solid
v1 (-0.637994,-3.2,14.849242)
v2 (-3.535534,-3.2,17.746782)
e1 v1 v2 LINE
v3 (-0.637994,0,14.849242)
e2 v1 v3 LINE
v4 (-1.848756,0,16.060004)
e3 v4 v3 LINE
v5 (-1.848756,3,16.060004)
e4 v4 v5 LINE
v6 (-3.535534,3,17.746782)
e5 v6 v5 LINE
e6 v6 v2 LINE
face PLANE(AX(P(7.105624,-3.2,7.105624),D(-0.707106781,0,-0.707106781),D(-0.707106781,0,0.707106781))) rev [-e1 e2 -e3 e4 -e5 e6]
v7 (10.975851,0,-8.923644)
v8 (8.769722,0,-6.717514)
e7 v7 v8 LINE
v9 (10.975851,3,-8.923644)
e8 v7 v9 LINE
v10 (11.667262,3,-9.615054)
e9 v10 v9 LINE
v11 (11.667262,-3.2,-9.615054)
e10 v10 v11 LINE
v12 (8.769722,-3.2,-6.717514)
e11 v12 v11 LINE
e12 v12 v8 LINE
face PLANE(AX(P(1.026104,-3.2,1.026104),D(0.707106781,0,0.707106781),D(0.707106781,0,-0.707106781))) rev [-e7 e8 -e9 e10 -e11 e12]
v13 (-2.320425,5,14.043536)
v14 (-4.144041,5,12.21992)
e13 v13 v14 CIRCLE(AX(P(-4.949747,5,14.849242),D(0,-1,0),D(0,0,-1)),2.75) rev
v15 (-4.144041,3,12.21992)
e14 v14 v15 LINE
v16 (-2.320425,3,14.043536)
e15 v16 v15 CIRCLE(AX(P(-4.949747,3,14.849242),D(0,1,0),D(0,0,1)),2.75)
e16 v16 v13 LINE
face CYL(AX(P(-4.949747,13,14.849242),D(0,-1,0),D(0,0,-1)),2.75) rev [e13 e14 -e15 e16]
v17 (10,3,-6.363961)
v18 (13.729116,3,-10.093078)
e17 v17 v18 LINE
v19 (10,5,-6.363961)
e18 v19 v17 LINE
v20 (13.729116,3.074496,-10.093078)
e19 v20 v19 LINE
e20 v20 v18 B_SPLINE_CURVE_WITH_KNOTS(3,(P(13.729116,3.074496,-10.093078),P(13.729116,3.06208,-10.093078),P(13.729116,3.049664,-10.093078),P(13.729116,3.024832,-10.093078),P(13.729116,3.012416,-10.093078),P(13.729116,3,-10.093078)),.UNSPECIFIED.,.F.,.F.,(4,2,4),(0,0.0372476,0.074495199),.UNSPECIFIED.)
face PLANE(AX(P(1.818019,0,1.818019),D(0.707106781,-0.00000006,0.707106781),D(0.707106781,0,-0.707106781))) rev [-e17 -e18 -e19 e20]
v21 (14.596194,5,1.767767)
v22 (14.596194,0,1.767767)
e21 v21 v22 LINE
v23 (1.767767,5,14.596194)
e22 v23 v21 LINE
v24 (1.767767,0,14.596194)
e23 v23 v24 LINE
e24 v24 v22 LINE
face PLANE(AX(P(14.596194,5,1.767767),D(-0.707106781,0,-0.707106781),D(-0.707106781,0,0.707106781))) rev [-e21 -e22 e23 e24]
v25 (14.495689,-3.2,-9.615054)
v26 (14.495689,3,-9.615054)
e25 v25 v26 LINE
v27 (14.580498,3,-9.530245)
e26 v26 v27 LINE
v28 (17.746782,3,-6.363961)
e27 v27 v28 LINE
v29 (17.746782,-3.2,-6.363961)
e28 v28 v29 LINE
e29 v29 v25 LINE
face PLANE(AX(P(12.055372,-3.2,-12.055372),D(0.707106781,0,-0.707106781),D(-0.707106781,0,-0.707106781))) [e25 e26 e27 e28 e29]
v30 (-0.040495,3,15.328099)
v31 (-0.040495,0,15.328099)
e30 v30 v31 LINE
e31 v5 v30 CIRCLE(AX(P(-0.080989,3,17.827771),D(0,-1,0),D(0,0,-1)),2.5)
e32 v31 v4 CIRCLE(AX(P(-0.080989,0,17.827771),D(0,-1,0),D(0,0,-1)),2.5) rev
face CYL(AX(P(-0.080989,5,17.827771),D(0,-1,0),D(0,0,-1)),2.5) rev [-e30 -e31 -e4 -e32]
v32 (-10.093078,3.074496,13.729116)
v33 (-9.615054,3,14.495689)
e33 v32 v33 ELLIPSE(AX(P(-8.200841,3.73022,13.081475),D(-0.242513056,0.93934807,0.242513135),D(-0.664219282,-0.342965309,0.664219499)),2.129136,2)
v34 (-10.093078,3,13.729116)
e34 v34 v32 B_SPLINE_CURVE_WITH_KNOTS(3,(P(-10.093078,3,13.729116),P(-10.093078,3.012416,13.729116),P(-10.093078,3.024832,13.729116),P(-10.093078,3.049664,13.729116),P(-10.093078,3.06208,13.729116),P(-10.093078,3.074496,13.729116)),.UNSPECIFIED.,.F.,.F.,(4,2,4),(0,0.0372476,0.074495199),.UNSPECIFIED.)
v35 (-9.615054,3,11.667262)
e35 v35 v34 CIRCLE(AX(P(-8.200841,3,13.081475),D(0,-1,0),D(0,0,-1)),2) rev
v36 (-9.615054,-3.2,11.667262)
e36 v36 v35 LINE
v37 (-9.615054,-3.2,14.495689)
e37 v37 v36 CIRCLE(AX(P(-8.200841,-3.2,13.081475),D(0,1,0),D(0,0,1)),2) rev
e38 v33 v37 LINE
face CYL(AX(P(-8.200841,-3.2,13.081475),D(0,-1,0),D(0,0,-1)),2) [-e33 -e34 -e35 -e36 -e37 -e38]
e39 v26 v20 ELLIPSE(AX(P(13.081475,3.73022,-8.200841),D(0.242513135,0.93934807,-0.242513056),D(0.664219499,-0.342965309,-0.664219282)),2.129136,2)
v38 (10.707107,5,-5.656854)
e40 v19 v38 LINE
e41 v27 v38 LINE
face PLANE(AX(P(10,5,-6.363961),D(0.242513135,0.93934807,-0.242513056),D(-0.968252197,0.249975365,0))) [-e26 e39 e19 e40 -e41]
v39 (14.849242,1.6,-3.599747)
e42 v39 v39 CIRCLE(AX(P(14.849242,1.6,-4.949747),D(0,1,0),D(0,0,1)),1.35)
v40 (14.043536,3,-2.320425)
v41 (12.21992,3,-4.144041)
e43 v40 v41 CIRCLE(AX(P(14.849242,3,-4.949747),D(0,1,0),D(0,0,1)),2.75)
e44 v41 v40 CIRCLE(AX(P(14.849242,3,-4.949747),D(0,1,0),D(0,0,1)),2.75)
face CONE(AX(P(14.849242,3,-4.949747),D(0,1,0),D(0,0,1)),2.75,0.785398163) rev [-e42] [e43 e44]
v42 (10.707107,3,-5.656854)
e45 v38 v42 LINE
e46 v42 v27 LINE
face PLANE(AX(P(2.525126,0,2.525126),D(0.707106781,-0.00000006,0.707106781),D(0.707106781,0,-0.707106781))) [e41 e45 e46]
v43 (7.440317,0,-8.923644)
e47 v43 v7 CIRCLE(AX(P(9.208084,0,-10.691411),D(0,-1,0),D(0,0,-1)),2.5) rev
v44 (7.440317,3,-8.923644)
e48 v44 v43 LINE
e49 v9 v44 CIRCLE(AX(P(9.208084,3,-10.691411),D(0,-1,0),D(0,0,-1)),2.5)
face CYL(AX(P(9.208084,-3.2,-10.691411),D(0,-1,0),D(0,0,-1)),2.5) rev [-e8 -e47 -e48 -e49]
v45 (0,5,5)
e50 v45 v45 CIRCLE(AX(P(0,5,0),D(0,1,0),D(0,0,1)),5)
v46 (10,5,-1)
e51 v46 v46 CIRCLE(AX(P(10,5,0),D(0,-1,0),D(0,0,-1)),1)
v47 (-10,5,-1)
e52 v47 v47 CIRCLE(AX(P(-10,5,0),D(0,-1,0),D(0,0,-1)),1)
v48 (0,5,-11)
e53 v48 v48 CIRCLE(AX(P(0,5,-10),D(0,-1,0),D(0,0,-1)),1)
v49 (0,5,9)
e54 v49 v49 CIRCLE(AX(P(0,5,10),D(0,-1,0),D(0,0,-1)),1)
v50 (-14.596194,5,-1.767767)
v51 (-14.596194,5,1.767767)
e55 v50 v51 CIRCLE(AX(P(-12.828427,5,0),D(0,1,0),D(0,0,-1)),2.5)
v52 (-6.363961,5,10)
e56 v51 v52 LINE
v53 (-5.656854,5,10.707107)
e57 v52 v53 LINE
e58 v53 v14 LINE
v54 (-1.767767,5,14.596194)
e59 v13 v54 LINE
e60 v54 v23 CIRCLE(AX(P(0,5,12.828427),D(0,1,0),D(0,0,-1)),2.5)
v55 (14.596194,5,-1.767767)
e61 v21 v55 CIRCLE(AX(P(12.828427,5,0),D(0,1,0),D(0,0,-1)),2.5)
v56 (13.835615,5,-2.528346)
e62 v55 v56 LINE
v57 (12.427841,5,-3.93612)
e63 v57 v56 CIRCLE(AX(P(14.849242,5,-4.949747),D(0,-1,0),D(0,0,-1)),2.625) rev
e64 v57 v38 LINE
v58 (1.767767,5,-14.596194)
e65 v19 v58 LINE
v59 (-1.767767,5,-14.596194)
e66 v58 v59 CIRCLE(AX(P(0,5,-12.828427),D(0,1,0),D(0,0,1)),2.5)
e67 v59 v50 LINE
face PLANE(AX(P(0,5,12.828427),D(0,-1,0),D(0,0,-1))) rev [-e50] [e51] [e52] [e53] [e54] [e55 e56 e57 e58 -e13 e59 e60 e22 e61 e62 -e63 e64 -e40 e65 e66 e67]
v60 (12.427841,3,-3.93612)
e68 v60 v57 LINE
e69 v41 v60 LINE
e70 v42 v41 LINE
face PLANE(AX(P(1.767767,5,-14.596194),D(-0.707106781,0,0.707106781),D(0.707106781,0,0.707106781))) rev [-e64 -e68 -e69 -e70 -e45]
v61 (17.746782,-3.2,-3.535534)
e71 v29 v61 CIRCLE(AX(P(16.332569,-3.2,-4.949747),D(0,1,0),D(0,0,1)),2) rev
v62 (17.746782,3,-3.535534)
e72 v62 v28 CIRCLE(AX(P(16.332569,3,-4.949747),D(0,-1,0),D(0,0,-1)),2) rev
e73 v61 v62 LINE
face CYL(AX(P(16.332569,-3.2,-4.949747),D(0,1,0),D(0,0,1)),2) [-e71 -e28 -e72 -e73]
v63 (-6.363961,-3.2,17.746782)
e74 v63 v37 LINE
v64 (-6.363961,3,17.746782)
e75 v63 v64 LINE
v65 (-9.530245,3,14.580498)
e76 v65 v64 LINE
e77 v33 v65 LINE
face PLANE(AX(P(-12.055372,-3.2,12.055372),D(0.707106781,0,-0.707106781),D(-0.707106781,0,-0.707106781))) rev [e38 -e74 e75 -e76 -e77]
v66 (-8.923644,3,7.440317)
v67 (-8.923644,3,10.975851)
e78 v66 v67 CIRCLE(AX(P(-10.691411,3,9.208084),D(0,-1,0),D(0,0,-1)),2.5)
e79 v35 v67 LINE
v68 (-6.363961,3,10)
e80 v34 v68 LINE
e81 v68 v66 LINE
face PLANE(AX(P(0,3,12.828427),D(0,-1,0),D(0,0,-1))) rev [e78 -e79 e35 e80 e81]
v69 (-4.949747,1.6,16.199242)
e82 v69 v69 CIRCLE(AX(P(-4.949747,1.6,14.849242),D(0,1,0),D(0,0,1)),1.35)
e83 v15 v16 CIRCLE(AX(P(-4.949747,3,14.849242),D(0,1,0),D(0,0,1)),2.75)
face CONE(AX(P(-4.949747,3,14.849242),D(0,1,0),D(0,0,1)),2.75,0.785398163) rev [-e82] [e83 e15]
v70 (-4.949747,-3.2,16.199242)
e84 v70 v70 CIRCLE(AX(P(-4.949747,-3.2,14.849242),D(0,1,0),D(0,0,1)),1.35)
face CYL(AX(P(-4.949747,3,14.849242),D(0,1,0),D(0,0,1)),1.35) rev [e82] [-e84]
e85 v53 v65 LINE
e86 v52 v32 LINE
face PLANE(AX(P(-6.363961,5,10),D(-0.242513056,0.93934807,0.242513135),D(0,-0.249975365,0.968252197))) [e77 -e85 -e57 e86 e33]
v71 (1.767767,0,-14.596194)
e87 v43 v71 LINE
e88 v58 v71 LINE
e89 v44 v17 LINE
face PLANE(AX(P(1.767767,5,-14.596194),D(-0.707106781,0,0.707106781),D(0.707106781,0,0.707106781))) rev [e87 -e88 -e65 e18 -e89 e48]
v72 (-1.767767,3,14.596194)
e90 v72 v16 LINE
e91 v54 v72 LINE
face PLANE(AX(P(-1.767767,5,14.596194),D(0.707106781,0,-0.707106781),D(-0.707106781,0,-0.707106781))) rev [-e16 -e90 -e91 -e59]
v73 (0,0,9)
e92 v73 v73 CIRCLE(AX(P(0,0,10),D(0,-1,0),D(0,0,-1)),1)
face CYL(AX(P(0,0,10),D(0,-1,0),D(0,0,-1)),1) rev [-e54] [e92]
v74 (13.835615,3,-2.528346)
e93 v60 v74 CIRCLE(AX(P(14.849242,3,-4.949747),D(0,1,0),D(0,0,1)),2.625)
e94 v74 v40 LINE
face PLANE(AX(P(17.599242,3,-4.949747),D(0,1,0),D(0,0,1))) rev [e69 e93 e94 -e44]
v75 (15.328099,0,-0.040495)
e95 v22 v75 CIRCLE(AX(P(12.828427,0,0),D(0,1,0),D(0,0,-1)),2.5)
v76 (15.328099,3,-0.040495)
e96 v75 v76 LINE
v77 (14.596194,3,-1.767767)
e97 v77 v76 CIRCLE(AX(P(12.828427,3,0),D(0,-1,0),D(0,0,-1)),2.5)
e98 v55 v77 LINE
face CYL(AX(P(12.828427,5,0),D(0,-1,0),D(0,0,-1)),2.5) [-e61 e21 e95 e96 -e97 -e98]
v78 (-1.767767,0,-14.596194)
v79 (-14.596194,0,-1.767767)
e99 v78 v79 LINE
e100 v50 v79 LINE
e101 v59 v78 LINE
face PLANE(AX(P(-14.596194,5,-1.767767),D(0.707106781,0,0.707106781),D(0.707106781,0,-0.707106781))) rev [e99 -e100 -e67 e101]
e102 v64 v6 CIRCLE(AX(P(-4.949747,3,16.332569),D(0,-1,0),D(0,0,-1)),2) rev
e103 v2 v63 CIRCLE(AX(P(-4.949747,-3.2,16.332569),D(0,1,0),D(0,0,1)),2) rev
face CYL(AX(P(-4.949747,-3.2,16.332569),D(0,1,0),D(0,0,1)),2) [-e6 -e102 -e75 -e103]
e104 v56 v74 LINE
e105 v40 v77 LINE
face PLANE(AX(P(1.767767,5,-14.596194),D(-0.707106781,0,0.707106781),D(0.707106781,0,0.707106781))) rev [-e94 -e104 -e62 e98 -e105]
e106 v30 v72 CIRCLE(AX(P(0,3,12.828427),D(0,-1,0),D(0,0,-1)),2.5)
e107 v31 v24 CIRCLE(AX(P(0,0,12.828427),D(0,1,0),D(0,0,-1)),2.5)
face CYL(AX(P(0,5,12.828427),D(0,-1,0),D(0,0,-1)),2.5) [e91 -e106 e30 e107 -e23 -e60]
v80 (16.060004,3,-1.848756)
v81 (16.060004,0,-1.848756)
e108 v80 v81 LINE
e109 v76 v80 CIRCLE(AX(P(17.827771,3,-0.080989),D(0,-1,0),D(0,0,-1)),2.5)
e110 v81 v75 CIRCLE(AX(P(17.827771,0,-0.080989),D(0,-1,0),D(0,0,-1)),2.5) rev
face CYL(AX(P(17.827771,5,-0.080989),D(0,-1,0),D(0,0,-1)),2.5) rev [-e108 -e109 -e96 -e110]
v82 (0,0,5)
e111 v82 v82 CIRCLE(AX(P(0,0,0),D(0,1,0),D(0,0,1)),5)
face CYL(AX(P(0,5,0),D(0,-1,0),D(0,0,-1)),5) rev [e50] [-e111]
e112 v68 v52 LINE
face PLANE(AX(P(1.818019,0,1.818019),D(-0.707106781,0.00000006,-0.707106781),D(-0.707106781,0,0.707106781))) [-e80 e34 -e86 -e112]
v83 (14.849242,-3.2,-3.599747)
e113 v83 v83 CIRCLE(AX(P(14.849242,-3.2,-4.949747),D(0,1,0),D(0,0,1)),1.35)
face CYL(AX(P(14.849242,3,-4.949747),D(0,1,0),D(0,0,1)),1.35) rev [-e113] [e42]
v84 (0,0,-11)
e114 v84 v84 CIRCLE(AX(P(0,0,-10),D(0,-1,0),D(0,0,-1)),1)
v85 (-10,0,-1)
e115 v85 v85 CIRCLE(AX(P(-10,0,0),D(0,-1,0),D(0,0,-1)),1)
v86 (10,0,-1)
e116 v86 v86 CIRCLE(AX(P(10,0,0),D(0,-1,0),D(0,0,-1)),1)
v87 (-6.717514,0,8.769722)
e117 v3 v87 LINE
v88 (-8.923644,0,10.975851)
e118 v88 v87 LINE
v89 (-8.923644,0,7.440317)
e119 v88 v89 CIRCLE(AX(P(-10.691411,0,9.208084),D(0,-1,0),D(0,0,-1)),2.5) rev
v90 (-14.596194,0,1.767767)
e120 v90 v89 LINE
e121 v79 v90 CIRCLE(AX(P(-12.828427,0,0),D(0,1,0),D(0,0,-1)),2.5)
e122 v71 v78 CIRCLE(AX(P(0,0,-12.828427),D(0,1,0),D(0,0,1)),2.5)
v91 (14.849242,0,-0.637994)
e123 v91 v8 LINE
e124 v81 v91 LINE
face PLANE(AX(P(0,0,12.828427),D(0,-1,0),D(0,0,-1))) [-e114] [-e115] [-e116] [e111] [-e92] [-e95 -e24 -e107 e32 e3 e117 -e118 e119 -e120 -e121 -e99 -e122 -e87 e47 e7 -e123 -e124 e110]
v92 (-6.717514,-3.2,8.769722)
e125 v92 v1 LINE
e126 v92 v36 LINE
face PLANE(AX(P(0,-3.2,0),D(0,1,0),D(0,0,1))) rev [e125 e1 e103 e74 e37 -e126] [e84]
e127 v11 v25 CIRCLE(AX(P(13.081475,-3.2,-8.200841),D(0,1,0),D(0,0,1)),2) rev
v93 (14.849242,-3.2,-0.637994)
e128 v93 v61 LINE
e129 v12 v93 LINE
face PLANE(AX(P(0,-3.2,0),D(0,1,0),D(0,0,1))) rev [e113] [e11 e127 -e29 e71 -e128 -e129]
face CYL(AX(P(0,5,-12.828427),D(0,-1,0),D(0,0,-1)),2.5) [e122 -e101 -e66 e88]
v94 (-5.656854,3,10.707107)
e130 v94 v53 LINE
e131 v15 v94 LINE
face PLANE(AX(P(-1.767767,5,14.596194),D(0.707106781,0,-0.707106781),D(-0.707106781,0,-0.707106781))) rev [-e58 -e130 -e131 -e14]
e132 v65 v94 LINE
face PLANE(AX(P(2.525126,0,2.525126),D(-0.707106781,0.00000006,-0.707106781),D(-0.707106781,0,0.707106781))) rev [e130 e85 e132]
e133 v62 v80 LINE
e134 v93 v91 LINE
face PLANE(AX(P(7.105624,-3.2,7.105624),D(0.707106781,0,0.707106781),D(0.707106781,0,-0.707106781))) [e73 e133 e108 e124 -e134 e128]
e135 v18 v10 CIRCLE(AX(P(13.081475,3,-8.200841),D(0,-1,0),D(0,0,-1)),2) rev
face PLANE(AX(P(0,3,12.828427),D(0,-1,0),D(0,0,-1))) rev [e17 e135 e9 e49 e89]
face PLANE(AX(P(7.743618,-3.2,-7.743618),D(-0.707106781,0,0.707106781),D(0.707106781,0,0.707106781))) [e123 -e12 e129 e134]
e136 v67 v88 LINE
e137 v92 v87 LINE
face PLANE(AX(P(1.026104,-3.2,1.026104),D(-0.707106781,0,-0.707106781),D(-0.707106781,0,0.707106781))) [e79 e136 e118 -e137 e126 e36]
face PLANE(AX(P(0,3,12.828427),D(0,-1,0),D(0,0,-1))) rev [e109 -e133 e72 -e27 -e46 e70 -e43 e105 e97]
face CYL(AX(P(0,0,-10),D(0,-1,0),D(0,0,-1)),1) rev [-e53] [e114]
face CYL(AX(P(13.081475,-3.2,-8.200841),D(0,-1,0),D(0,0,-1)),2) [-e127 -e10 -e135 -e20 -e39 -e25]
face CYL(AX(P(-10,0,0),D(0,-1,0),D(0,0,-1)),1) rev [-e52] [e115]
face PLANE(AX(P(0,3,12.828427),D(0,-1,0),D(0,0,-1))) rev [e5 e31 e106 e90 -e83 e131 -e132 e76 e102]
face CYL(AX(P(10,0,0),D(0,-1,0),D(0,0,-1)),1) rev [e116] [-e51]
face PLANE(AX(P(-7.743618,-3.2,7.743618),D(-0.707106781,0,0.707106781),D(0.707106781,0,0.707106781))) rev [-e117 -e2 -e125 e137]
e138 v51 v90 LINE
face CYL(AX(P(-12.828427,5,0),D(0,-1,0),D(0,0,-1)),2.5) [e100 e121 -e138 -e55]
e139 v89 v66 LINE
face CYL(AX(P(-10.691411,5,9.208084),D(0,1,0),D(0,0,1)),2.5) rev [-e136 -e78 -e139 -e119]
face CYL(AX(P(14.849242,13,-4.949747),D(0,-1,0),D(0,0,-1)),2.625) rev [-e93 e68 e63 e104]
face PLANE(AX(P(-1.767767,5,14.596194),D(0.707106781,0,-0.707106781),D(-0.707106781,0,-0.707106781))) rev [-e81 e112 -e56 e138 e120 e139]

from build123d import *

# Parameters (mm, degrees)
SKETCH1_R                                      = 0.5
SKETCH1_R_2                                    = 5
BOSS_EXTRUDE1_DEPTH                            = 5
BOSS_EXTRUDE4_DEPTH                            = 5.7
BOSS_EXTRUDE4_DEPTH_BACK                       = 0.5
SKETCH3_R                                      = 1.3
BOSS_EXTRUDE6_DEPTH                            = 1
FILLET1_R                                      = 2.5
FILLET2_R                                      = 2
F_2_0MM_DOWEL_HOLE1_D                          = 2
F_2_0MM_DOWEL_HOLE1_DEPTH                      = 42.93
F_2_0MM_DOWEL_HOLE1_TIP                        = 0.600860619
SKETCH12_R                                     = 2.75
SKETCH12_R_2                                   = 2.625
CUT_EXTRUDE1_DEPTH                             = 10
CSK_FOR_M2_5_FLAT_HEAD_MACHINE_SCREW1_AT_COUNT = 2
CSK_FOR_M2_5_FLAT_HEAD_MACHINE_SCREW1_AT_PITCH = 28


with BuildPart() as part:
    # Sketch1 → Boss-Extrude1 (new body)
    with BuildSketch(Plane(origin=(0, 0, 0), x_dir=(1, 0, 0), z_dir=(0, 1, 0))):
        with BuildLine():
            Line((1.767766953, 14.596194078), (14.596194078, 1.767766953))
            ThreePointArc((14.596194078, 1.767766953), (15.328427125, 0), (14.596194078, -1.767766953))
            Line((14.596194078, -1.767766953), (1.767766953, -14.596194078))
            ThreePointArc((1.767766953, -14.596194078), (0, -15.328427125), (-1.767766953, -14.596194078))
            Line((-1.767766953, -14.596194078), (-14.596194078, -1.767766953))
            ThreePointArc((-14.596194078, -1.767766953), (-15.328427125, 0), (-14.596194078, 1.767766953))
            Line((-14.596194078, 1.767766953), (-1.767766953, 14.596194078))
            ThreePointArc((-1.767766953, 14.596194078), (0, 15.328427125), (1.767766953, 14.596194078))
        make_face()
        with Locations(Location((0, 10, 0), (0, 0, 270))):
            Circle(SKETCH1_R, mode=Mode.SUBTRACT)
        with Locations(Location((0, -10, 0), (0, 0, 270))):
            Circle(SKETCH1_R, mode=Mode.SUBTRACT)
        with Locations(Location((10, 0, 0), (0, 0, 270))):
            Circle(SKETCH1_R, mode=Mode.SUBTRACT)
        with Locations(Location((-10, 0, 0), (0, 0, 270))):
            Circle(SKETCH1_R, mode=Mode.SUBTRACT)
        with Locations(Location((0, 0, 0), (0, 0, 270))):
            Circle(SKETCH1_R_2, mode=Mode.SUBTRACT)
    extrude(amount=BOSS_EXTRUDE1_DEPTH)

    # Sketch3 → Boss-Extrude4 (add, two sides: drawn at the far end of the back side and taken through both)
    # profile 1 of 4: a face of its own
    with BuildSketch(Plane(origin=(0, -2.7, 0), x_dir=(1, 0, 0), z_dir=(0, 1, 0)).offset(-BOSS_EXTRUDE4_DEPTH_BACK)):
        Polygon((-4.949747468, -10.537489101), (-0.637994164, -14.849242405), (-4.949747468, -19.160995709), (-9.261500772, -14.849242405), align=None)
        with Locations(Location((-4.949747468, -14.849242405, 0), (0, 0, 270))):
            Circle(SKETCH3_R, mode=Mode.SUBTRACT)
    # profile 2 of 4: a face of its own
    with BuildSketch(Plane(origin=(0, -2.7, 0), x_dir=(1, 0, 0), z_dir=(0, 1, 0)).offset(-BOSS_EXTRUDE4_DEPTH_BACK)):
        Polygon((-6.717514421, -8.769722148), (-11.029267725, -13.081475452), (-9.261500772, -14.849242405), (-4.949747468, -10.537489101), align=None)
    # profile 3 of 4: a face of its own
    with BuildSketch(Plane(origin=(0, -2.7, 0), x_dir=(1, 0, 0), z_dir=(0, 1, 0)).offset(-BOSS_EXTRUDE4_DEPTH_BACK)):
        Polygon((19.160995709, 4.949747468), (14.849242405, 9.261500772), (10.537489101, 4.949747468), (14.849242405, 0.637994164), align=None)
        with Locations(Location((14.849242405, 4.949747468, 0), (0, 0, 270))):
            Circle(SKETCH3_R, mode=Mode.SUBTRACT)
    # profile 4 of 4: a face of its own
    with BuildSketch(Plane(origin=(0, -2.7, 0), x_dir=(1, 0, 0), z_dir=(0, 1, 0)).offset(-BOSS_EXTRUDE4_DEPTH_BACK)):
        Polygon((13.081475452, 11.029267725), (14.849242405, 9.261500772), (10.537489101, 4.949747468), (8.769722148, 6.717514421), align=None)
    extrude(amount=BOSS_EXTRUDE4_DEPTH + BOSS_EXTRUDE4_DEPTH_BACK)


with BuildPart() as boss_extrude6_tool:
    # Sketch7 → Boss-Extrude6 (new body)
    with BuildSketch(Plane(origin=(2.525126055, -2.13e-07, 2.525126055), x_dir=(0.7071067811865474, 0, -0.7071067811865477), z_dir=(0.7071067811865465, -5.960464483662305e-08, 0.7071067811865461))):
        Polygon((11.571067812, 5.000000541), (17.04887, 3.00000056), (11.571067812, 3.000000541), align=None)
        Polygon((-11.571067812, 5.000000541), (-17.04887, 3.00000056), (-11.571067812, 3.000000541), align=None)
    extrude(amount=-BOSS_EXTRUDE6_DEPTH)


with BuildPart() as part_1:
    add(part.part)


with BuildPart() as part_2:
    # Boss-Extrude6: joined with boss_extrude6_tool
    add(part_1.part.fuse(boss_extrude6_tool.part, tol=0.00001))

    # Fillet1
    fillet1_edges = [part_2.edges().sort_by_distance(p)[0] for p in [
        (-7.155876652, 1.5, 9.208084379),
        (-0.935534875, 1.5, 15.146783115),
        (9.208084379, 1.5, -7.155876652),
        (15.146783115, 1.5, -0.935534875),
    ]]
    fillet(fillet1_edges, radius=FILLET1_R)

    # Fillet2
    # the kernel refuses this fillet: 2 mm, written as the material it takes off along each edge
    with BuildSketch(Plane(origin=(-4.949747468, 8, 19.160995709), x_dir=(0.7071067811865477, 0, -0.7071067811865475), z_dir=(0, -1, 0)), Plane(origin=(-11.029267725, -8.2, 13.081475452), x_dir=(0.7071067811865476, 0, -0.7071067811865476), z_dir=(0, 1, 0))) as fillet2_piece_1:
        with BuildLine():
            CenterArc((FILLET2_R, -FILLET2_R), FILLET2_R, 90, 90)
            Line((0, -FILLET2_R), (0, 0))
            Line((0, 0), (FILLET2_R, 0))
        make_face()
    extrude(amount=16.2, mode=Mode.SUBTRACT)
    with BuildSketch(Plane(origin=(13.081475452, -8.2, -11.029267725), x_dir=(-0.7071067811865471, 0, 0.707106781186548), z_dir=(0, 1, 0)), Plane(origin=(19.160995709, 8, -4.949747468), x_dir=(-0.7071067811865472, 0, 0.7071067811865477), z_dir=(0, -1, 0))) as fillet2_piece_2:
        with BuildLine():
            CenterArc((FILLET2_R, FILLET2_R), FILLET2_R, 180, 90)
            Line((0, FILLET2_R), (0, 0))
            Line((0, 0), (FILLET2_R, 0))
        make_face()
    extrude(amount=16.2, mode=Mode.SUBTRACT)

    # Ø2.0mm Dowel Hole1
    with Locations(Plane.XZ):
        with Locations((0, 10), (10, 0), (-10, 0), (0, -10)):
            Hole(F_2_0MM_DOWEL_HOLE1_D / 2, depth=F_2_0MM_DOWEL_HOLE1_DEPTH)
            with Locations((0, 0, -(F_2_0MM_DOWEL_HOLE1_DEPTH + F_2_0MM_DOWEL_HOLE1_TIP / 2))):  # 118° drill point
                Cone(0, F_2_0MM_DOWEL_HOLE1_D / 2, F_2_0MM_DOWEL_HOLE1_TIP, mode=Mode.SUBTRACT)

    # Sketch12 → Cut-Extrude1 (cut)
    with BuildSketch(Plane(origin=(0, 3, 0), x_dir=(1, 0, 0), z_dir=(0, 1, 0))):
        with Locations((-4.949747468, -14.849242405)):
            Circle(SKETCH12_R)
        with Locations((14.849242405, 4.949747468)):
            Circle(SKETCH12_R_2)
    extrude(amount=CUT_EXTRUDE1_DEPTH, mode=Mode.SUBTRACT)

    # Sketch13 → CSK for M2.5 Flat Head Machine Screw1 (revolve, cut)
    with BuildSketch(Plane(origin=(-4.949747468, 3, 14.849242405), x_dir=(0, 0, 1), z_dir=(1, 0, 0))):
        Polygon((0, 0), (0, 43.741161836), (1.35, 42.93), (1.35, 1.4), (2.75, 0), align=None)
    csk_for_m2_5_flat_head_machine_screw1 = revolve(axis=Axis((-4.949747468, 9.35, 14.849242405), (0, -1, 0)), mode=Mode.SUBTRACT)

    # CSK for M2.5 Flat Head Machine Screw1 at: CSK for M2.5 Flat Head Machine Screw1 ×2
    with Locations(*[Vector(0.7071067811865477, 0, -0.7071067811865475) * (i * CSK_FOR_M2_5_FLAT_HEAD_MACHINE_SCREW1_AT_PITCH) for i in range(1, CSK_FOR_M2_5_FLAT_HEAD_MACHINE_SCREW1_AT_COUNT)]):
        add(csk_for_m2_5_flat_head_machine_screw1, mode=Mode.SUBTRACT)


solid = part_2.part
